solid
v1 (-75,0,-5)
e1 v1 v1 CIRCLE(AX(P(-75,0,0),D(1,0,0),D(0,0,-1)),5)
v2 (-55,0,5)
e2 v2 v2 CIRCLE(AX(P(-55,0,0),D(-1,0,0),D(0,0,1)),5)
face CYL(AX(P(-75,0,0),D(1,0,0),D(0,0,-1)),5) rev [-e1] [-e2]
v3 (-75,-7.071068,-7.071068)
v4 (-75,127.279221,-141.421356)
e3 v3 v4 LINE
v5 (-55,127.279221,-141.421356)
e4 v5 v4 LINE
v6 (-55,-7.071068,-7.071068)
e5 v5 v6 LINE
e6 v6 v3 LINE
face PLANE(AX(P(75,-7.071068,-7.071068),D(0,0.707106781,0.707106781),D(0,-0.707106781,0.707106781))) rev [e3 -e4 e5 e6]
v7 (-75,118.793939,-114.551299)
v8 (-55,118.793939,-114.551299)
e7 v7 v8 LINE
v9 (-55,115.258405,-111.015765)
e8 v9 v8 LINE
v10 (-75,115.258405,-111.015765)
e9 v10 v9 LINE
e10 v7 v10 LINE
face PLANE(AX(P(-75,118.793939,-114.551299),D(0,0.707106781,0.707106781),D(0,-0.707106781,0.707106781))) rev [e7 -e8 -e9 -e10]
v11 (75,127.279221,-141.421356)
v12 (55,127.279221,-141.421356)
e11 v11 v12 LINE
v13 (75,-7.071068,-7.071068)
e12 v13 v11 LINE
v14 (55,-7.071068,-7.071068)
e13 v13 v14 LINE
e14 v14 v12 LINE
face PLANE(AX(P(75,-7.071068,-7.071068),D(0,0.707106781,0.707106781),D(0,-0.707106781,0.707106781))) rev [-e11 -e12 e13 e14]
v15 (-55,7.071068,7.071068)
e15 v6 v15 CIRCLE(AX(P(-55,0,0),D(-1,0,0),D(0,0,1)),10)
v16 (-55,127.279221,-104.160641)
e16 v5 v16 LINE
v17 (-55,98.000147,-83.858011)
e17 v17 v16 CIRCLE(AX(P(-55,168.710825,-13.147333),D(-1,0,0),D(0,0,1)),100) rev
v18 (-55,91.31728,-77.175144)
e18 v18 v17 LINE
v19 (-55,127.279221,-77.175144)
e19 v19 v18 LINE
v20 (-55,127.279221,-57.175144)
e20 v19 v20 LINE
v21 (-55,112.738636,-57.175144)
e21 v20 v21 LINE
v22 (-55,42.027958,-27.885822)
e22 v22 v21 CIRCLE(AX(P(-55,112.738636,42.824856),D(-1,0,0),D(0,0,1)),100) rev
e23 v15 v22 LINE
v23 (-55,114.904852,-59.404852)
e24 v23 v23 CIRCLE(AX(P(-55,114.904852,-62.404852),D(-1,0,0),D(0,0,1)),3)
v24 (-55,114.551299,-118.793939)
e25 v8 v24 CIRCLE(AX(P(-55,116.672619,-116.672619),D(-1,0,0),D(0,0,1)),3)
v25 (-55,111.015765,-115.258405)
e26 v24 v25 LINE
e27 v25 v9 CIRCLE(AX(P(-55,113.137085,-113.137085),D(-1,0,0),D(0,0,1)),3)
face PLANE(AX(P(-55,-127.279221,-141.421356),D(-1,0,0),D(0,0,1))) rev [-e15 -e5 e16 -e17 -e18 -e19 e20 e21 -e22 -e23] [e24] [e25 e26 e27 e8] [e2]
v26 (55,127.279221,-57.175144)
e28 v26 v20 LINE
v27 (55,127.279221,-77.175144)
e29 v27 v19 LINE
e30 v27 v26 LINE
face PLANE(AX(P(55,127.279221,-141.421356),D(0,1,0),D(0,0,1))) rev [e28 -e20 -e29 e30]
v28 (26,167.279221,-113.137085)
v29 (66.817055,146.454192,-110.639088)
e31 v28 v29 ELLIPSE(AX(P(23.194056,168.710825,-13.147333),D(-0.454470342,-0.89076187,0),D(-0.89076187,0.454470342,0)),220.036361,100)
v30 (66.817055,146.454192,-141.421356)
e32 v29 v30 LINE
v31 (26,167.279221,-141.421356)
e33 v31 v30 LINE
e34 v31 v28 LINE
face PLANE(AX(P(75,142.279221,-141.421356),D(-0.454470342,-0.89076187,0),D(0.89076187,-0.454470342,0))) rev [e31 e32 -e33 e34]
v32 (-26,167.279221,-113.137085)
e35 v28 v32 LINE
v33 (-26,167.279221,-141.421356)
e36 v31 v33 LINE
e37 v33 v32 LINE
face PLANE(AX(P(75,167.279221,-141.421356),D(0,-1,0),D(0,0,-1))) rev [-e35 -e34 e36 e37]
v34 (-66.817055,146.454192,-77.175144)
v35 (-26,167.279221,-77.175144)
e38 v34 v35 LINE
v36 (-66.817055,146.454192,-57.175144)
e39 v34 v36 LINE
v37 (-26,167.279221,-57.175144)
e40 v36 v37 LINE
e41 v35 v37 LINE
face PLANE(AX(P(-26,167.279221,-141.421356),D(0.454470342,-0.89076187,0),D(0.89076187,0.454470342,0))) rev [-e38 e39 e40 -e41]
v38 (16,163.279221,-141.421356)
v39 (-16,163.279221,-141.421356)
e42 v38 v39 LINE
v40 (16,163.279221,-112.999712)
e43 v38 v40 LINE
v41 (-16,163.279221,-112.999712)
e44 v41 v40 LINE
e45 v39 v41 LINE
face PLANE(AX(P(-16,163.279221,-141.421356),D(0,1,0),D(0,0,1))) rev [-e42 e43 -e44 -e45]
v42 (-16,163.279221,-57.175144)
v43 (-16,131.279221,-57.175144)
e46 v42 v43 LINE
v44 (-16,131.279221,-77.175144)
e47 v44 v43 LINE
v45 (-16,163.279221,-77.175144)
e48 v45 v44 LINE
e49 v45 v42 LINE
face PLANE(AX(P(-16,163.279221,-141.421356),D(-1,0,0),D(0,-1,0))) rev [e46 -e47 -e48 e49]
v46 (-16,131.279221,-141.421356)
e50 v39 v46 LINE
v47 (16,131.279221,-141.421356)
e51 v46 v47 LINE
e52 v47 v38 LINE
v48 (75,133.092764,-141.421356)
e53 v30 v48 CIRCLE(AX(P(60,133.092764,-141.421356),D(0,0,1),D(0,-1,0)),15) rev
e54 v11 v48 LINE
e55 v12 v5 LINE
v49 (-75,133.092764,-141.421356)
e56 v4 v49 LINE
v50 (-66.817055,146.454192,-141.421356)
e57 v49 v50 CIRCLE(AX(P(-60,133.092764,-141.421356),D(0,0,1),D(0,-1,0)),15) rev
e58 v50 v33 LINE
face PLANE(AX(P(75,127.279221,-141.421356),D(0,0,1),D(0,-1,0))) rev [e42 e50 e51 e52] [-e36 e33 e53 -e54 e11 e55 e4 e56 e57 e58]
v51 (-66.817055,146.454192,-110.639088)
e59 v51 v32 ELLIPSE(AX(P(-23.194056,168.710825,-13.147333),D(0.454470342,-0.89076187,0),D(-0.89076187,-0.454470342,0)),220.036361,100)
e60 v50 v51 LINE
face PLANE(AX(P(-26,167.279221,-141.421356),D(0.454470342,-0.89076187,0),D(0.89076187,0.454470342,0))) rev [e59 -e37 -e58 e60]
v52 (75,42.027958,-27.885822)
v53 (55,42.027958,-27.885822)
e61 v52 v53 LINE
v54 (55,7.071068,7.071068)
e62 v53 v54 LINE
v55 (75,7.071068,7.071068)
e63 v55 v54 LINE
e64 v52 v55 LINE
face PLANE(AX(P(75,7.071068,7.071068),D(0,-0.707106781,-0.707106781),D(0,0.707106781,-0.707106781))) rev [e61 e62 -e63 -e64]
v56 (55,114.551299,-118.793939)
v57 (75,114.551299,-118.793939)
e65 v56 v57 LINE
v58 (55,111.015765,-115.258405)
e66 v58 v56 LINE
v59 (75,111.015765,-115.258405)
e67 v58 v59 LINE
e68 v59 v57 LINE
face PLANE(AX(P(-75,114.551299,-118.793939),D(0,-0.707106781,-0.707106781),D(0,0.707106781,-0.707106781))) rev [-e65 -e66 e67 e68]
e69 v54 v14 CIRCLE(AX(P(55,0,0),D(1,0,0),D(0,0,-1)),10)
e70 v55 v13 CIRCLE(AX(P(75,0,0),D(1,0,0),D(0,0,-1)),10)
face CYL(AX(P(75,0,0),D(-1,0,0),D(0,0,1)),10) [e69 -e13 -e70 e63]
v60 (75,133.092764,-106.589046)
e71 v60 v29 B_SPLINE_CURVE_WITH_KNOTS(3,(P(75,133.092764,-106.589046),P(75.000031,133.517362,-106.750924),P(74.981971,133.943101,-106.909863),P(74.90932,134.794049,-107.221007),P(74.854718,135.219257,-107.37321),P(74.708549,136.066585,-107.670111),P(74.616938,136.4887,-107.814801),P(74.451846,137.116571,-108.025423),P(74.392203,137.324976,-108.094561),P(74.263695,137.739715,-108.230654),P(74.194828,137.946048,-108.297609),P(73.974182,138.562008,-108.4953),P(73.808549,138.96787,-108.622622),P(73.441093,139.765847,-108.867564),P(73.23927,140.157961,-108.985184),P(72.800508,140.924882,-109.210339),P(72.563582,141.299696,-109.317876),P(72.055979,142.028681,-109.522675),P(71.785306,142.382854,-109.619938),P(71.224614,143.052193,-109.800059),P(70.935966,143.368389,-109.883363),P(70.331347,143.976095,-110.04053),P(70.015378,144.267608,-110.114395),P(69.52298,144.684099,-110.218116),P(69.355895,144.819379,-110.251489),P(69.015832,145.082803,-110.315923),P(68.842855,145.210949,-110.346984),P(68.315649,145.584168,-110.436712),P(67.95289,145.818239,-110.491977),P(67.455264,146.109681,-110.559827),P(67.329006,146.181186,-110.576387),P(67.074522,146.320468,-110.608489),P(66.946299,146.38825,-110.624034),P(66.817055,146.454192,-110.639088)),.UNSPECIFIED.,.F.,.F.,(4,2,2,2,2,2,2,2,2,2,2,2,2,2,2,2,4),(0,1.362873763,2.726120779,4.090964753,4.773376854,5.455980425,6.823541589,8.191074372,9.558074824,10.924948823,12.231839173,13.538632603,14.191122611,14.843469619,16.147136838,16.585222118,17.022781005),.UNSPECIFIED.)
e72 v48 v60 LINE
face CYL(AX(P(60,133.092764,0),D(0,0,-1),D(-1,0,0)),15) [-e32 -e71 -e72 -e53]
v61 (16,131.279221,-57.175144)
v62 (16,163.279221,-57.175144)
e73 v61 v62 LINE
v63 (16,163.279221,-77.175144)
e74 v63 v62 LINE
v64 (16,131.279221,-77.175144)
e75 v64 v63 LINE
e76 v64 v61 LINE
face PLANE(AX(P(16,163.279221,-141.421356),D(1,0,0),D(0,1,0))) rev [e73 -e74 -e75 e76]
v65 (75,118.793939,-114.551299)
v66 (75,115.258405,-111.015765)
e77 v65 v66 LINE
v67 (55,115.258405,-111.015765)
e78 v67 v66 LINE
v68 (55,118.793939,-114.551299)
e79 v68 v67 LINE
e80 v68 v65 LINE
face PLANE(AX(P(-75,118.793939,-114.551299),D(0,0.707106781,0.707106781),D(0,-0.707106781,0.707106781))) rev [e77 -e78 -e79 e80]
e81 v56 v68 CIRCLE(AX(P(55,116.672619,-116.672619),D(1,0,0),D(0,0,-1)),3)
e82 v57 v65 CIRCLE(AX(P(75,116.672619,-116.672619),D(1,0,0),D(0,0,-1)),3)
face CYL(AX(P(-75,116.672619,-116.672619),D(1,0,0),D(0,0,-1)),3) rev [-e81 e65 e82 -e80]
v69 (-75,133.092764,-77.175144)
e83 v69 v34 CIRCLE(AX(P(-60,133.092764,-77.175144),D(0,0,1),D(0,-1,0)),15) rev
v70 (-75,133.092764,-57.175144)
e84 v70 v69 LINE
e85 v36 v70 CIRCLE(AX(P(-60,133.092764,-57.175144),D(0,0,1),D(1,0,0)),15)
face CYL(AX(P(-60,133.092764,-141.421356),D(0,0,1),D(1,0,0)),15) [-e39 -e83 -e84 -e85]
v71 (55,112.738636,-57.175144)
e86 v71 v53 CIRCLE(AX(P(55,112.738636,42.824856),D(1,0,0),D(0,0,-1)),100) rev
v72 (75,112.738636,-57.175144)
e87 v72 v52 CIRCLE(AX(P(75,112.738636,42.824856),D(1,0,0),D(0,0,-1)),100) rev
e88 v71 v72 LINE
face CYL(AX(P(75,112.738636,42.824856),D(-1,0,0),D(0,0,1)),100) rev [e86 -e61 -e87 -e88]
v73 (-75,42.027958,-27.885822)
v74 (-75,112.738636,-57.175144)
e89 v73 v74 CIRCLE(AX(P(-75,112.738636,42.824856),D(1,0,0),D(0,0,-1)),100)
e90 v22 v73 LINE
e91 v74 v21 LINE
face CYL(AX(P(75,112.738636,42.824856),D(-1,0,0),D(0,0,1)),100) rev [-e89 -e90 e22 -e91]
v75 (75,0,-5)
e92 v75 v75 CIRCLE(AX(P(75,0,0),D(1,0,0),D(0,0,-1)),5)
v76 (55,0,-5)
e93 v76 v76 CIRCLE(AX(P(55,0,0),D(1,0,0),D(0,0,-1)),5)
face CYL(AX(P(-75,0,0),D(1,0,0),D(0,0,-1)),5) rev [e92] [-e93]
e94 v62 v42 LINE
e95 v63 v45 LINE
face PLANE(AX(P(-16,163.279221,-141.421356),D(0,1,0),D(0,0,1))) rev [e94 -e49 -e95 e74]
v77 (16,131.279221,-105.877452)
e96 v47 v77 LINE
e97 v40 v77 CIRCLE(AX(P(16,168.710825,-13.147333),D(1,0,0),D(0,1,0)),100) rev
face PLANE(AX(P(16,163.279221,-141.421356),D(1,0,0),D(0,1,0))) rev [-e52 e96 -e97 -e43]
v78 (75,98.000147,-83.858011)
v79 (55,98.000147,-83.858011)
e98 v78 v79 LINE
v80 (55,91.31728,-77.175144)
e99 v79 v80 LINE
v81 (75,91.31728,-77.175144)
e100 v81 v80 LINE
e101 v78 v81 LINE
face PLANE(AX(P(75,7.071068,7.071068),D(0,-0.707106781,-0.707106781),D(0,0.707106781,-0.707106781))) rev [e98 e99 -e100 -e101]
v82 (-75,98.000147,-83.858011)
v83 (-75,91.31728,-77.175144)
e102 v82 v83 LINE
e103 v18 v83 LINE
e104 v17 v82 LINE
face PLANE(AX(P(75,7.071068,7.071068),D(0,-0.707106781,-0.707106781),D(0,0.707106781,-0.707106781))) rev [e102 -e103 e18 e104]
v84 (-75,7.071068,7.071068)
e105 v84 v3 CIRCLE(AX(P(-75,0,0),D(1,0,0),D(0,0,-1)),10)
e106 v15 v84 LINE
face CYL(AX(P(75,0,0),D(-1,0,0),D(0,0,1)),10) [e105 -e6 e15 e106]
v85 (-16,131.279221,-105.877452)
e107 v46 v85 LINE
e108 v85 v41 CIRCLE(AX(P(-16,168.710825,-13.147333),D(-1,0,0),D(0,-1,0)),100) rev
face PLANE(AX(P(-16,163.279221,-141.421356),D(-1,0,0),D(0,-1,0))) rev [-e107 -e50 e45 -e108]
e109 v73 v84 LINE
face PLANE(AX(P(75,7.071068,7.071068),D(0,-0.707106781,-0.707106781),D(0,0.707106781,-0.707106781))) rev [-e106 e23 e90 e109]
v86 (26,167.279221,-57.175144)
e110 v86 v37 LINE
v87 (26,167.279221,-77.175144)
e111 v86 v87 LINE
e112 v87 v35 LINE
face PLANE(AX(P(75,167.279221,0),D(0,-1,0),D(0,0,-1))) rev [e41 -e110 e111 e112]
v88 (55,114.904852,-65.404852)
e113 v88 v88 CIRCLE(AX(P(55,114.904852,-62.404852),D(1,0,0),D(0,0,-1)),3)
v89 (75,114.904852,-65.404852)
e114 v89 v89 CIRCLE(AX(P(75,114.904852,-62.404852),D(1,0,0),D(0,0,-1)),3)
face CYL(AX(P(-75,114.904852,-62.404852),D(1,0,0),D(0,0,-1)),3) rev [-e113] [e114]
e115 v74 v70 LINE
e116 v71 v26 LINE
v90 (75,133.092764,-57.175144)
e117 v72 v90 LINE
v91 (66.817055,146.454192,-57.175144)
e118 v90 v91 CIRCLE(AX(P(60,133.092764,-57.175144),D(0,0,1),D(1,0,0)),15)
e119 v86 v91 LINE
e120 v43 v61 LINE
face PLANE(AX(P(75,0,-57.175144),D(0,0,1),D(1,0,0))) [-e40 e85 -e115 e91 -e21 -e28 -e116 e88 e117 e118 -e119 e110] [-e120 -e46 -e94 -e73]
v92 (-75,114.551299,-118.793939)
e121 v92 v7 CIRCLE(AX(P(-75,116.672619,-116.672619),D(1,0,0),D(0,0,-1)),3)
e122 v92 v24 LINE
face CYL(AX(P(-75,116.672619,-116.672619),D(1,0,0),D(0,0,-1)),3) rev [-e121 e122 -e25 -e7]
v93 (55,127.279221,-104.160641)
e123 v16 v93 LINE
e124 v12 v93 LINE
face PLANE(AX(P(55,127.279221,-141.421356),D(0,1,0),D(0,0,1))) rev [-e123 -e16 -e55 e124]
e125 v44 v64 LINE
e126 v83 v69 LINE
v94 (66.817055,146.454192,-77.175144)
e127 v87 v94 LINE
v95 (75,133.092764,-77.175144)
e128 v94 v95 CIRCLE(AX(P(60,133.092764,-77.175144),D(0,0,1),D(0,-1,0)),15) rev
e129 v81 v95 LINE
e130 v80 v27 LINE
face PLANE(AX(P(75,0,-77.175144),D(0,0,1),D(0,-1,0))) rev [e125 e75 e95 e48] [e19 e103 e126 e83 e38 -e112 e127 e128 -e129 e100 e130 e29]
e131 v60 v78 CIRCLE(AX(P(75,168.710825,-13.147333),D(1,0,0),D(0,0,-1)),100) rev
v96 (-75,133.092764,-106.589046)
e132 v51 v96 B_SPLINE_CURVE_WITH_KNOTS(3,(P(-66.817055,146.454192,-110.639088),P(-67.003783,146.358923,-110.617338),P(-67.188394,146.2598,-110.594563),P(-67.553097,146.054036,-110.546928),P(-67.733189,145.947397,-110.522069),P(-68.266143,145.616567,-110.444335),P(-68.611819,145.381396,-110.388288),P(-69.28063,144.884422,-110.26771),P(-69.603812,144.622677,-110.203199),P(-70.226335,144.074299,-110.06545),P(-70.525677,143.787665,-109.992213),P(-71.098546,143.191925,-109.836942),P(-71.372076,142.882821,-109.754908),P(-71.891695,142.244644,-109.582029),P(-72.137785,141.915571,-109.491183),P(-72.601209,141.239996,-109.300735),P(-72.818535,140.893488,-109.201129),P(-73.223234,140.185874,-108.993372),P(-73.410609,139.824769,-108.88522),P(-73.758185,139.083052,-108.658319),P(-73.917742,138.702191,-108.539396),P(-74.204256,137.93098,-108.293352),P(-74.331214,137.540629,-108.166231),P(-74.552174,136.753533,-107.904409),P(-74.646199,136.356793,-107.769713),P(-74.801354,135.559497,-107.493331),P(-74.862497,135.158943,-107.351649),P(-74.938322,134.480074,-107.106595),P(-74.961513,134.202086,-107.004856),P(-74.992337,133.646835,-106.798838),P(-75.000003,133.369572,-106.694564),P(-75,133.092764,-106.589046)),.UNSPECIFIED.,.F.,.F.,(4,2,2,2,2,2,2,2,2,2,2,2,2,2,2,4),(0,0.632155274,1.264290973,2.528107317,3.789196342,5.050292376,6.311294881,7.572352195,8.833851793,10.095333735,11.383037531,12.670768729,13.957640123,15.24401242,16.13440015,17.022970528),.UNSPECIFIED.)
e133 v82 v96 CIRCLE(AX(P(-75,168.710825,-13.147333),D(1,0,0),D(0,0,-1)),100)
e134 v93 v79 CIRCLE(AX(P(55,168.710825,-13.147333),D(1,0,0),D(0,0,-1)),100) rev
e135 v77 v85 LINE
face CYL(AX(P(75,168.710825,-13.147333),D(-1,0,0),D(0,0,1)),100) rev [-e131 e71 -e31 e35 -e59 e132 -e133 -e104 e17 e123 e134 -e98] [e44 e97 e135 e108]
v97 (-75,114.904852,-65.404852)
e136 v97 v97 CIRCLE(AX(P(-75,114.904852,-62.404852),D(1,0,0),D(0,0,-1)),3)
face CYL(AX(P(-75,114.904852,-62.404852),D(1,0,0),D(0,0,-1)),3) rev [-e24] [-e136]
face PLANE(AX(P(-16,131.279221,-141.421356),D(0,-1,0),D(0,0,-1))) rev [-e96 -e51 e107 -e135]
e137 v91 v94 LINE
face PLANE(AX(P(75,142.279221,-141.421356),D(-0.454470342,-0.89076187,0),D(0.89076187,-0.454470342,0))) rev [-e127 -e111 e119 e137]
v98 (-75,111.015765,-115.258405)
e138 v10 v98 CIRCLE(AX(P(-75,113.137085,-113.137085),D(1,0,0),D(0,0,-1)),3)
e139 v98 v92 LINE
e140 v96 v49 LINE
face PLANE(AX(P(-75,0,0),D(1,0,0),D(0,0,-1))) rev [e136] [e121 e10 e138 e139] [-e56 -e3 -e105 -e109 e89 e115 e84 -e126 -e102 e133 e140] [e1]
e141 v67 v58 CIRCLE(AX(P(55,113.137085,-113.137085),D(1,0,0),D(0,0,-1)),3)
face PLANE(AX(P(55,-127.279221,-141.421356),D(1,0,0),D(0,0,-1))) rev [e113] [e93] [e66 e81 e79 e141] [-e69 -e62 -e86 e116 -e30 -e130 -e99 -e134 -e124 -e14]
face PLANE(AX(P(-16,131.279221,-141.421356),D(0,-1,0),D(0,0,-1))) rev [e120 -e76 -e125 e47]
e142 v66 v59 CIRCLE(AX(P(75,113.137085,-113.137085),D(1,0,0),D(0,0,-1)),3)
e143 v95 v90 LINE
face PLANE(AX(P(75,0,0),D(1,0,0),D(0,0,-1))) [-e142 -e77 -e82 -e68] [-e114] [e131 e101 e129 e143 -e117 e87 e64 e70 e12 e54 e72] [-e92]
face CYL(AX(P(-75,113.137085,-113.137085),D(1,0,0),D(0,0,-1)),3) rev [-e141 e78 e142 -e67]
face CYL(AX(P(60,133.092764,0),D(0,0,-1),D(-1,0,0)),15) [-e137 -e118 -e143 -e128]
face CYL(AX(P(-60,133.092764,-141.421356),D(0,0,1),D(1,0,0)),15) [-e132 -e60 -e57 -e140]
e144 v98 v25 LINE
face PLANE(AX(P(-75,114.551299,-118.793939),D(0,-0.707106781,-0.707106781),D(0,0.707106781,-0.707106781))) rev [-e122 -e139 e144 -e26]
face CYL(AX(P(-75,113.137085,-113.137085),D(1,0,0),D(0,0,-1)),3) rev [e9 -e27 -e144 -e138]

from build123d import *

# Parameters (mm, degrees)
BOSS_EXTRUDE1_DEPTH     = 75
BOSS_EXTRUDE2_DEPTH     = 75
SKETCH6_W               = 32
SKETCH6_H               = 32
CUT_EXTRUDE1_DEPTH      = 232.532584422
FILLET1_START           = -75
FILLET1_DEPTH           = 150
FILLET1_START_2         = -40.56574
FILLET1_2_DEPTH         = 24.56574
FILLET1_START_3         = 16
FILLET1_3_DEPTH         = 10
FILLET1_START_4         = -26
FILLET1_4_DEPTH         = 101
FILLET1_5_DEPTH         = 34.43426
FILLET1_START_5         = -113.13708499
FILLET1_6_OUTLINE_W     = 32
FILLET1_6_OUTLINE_H     = 32
FILLET1_6_DEPTH         = 29.279073903
CUT_EXTRUDE3_DEPTH      = 232.532584422
CUT_EXTRUDE3_DEPTH_BACK = 232.532584422
SKETCH10_W              = 110
SKETCH10_H              = 254.558441228
CUT_EXTRUDE4_DEPTH      = 232.532584422
CUT_EXTRUDE4_DEPTH_BACK = 232.532584422
SKETCH11_R              = 5
SKETCH11_R_2            = 3
FILLET2_R               = 15


with BuildPart() as part:
    # Sketch3 → Boss-Extrude1 (new, symmetric)
    with BuildSketch(Plane(origin=(0, 0, 0), x_dir=(0, 0, -1), z_dir=(1, 0, 0))):
        with BuildLine():
            Line((7.071067812, -7.071067812), (141.421356237, 127.279220614))
            Line((141.421356237, 127.279220614), (141.421356237, 167.279220614))
            Line((141.421356237, 167.279220614), (113.13708499, 167.279220614))
            Line((113.13708499, 167.279220614), (113.13708499, 127.279220614))
            Line((113.13708499, 127.279220614), (-7.071067812, 7.071067812))
            ThreePointArc((-7.071067812, 7.071067812), (-7.071067812, -7.071067812), (7.071067812, -7.071067812))
        make_face()
    extrude(amount=BOSS_EXTRUDE1_DEPTH, both=True)

    # Sketch9 → Boss-Extrude2 (add, symmetric)
    with BuildSketch(Plane(origin=(0, 0, 0), x_dir=(0, 0, -1), z_dir=(1, 0, 0))):
        Polygon((57.175144213, 127.279220614), (57.175144213, 167.279220614), (77.175144213, 167.279220614), (77.175144213, 127.279220614), (77.175144213, 91.317279836), (57.175144213, 71.317279836), align=None)
    extrude(amount=BOSS_EXTRUDE2_DEPTH, both=True)

    # Sketch6 → Cut-Extrude1 (cut, through all)
    with BuildSketch(Plane.XY):
        with Locations((0, 147.279220614)):
            Rectangle(SKETCH6_W, SKETCH6_H)
        Polygon((-26, 167.279220614), (-75, 142.279220614), (-75, 167.279220614), align=None)
        Polygon((26, 167.279220614), (75, 167.279220614), (75, 142.279220614), align=None)
    extrude(amount=-CUT_EXTRUDE1_DEPTH, mode=Mode.SUBTRACT)

    # Fillet1: read off the stored shape, not the designer's step
    # Fillet1 outline → Fillet1 (add)
    with BuildSketch(Plane.YZ.offset(FILLET1_START)):
        with BuildLine():
            Line((131.279220614, -113.13708499), (131.279220614, -105.877452163))
            ThreePointArc((131.279220614, -105.877452163), (113.530191873, -96.544561619), (98.00014671, -83.858011087))
            Line((98.00014671, -83.858011087), (127.279220614, -113.13708499))
            Line((127.279220614, -113.13708499), (131.279220614, -113.13708499))
        make_face()
        with BuildLine():
            Line((71.317279836, -57.175144213), (112.738636074, -57.175144213))
            ThreePointArc((112.738636074, -57.175144213), (74.470292837, -49.563097464), (42.027957955, -27.885822331))
            Line((42.027957955, -27.885822331), (71.317279836, -57.175144213))
        make_face()
    extrude(amount=FILLET1_DEPTH)

    # Fillet1 2 outline → Fillet1 2 (add)
    with BuildSketch(Plane.YZ.offset(FILLET1_START_2)):
        with BuildLine():
            ThreePointArc((167.279220614, -113.13708499), (148.943103424, -111.174049686), (131.279220614, -105.877452163))
            Line((131.279220614, -105.877452163), (131.279220614, -113.13708499))
            Line((131.279220614, -113.13708499), (167.279220614, -113.13708499))
        make_face()
    extrude(amount=FILLET1_2_DEPTH)

    # Fillet1 3 outline → Fillet1 3 (add)
    with BuildSketch(Plane.YZ.offset(FILLET1_START_3)):
        with BuildLine():
            ThreePointArc((167.279220614, -113.13708499), (148.943103424, -111.174049686), (131.279220614, -105.877452163))
            Line((131.279220614, -105.877452163), (131.279220614, -113.13708499))
            Line((131.279220614, -113.13708499), (167.279220614, -113.13708499))
        make_face()
    extrude(amount=FILLET1_3_DEPTH)

    # Fillet1 4 outline → Fillet1 4 (add)
    with BuildSketch(Plane.YZ.offset(FILLET1_START_4)):
        with BuildLine():
            Line((131.279220614, -113.13708499), (167.279220614, -113.13708499))
            ThreePointArc((167.279220614, -113.13708499), (148.943103424, -111.174049686), (131.279220614, -105.877452163))
            Line((131.279220614, -105.877452163), (131.279220614, -113.13708499))
        make_face()
    extrude(amount=FILLET1_4_DEPTH)

    # Fillet1 5 outline → Fillet1 5 (add)
    with BuildSketch(Plane.YZ.offset(FILLET1_START)):
        with BuildLine():
            Line((131.279220614, -113.13708499), (167.279220614, -113.13708499))
            ThreePointArc((167.279220614, -113.13708499), (148.943103424, -111.174049686), (131.279220614, -105.877452163))
            Line((131.279220614, -105.877452163), (131.279220614, -113.13708499))
        make_face()
    extrude(amount=FILLET1_5_DEPTH)

    # Fillet1 6 outline → Fillet1 6 (cut)
    with BuildSketch(Plane.XY.offset(FILLET1_START_5)):
        Polygon((75, 167.279220614), (26, 167.279220614), (75, 142.279220614), align=None)
        Polygon((-26, 167.279220614), (-75, 167.279220614), (-75, 142.279220614), align=None)
        with Locations((0, 147.279220614)):
            Rectangle(FILLET1_6_OUTLINE_W, FILLET1_6_OUTLINE_H)
    extrude(amount=FILLET1_6_DEPTH, mode=Mode.SUBTRACT)

    # Sketch10 → Cut-Extrude3 (cut, two sides: drawn at the far end of the back side and taken through both)
    with BuildSketch(Plane.XY.offset(-CUT_EXTRUDE3_DEPTH_BACK)):
        Rectangle(SKETCH10_W, SKETCH10_H)
    extrude(amount=CUT_EXTRUDE3_DEPTH + CUT_EXTRUDE3_DEPTH_BACK, mode=Mode.SUBTRACT)

    # Sketch11 → Cut-Extrude4 (cut, two sides: drawn at the far end of the back side and taken through both)
    with BuildSketch(Plane(origin=(0, 0, 0), x_dir=(0, 0, -1), z_dir=(1, 0, 0)).offset(-CUT_EXTRUDE4_DEPTH_BACK)):
        Circle(SKETCH11_R)
        with Locations((62.404851943, 114.904851943)):
            Circle(SKETCH11_R_2)
        with BuildLine():
            Line((118.793939239, 114.551298552), (115.258405333, 111.015764646))
            ThreePointArc((115.258405333, 111.015764646), (111.015764646, 111.015764646), (111.015764646, 115.258405333))
            Line((111.015764646, 115.258405333), (114.551298552, 118.793939239))
            ThreePointArc((114.551298552, 118.793939239), (118.793939239, 118.793939239), (118.793939239, 114.551298552))
        make_face()
    extrude(amount=CUT_EXTRUDE4_DEPTH + CUT_EXTRUDE4_DEPTH_BACK, mode=Mode.SUBTRACT)

    # Fillet2
    fillet2_edges = [part.edges().sort_by_distance(p)[0] for p in [
        (75, 142.279220614, -127.279220614),
        (75, 142.279220614, -67.175144213),
        (-75, 142.279220614, -127.279220614),
        (-75, 142.279220614, -67.175144213),
    ]]
    fillet(fillet2_edges, radius=FILLET2_R)


solid = part.part
